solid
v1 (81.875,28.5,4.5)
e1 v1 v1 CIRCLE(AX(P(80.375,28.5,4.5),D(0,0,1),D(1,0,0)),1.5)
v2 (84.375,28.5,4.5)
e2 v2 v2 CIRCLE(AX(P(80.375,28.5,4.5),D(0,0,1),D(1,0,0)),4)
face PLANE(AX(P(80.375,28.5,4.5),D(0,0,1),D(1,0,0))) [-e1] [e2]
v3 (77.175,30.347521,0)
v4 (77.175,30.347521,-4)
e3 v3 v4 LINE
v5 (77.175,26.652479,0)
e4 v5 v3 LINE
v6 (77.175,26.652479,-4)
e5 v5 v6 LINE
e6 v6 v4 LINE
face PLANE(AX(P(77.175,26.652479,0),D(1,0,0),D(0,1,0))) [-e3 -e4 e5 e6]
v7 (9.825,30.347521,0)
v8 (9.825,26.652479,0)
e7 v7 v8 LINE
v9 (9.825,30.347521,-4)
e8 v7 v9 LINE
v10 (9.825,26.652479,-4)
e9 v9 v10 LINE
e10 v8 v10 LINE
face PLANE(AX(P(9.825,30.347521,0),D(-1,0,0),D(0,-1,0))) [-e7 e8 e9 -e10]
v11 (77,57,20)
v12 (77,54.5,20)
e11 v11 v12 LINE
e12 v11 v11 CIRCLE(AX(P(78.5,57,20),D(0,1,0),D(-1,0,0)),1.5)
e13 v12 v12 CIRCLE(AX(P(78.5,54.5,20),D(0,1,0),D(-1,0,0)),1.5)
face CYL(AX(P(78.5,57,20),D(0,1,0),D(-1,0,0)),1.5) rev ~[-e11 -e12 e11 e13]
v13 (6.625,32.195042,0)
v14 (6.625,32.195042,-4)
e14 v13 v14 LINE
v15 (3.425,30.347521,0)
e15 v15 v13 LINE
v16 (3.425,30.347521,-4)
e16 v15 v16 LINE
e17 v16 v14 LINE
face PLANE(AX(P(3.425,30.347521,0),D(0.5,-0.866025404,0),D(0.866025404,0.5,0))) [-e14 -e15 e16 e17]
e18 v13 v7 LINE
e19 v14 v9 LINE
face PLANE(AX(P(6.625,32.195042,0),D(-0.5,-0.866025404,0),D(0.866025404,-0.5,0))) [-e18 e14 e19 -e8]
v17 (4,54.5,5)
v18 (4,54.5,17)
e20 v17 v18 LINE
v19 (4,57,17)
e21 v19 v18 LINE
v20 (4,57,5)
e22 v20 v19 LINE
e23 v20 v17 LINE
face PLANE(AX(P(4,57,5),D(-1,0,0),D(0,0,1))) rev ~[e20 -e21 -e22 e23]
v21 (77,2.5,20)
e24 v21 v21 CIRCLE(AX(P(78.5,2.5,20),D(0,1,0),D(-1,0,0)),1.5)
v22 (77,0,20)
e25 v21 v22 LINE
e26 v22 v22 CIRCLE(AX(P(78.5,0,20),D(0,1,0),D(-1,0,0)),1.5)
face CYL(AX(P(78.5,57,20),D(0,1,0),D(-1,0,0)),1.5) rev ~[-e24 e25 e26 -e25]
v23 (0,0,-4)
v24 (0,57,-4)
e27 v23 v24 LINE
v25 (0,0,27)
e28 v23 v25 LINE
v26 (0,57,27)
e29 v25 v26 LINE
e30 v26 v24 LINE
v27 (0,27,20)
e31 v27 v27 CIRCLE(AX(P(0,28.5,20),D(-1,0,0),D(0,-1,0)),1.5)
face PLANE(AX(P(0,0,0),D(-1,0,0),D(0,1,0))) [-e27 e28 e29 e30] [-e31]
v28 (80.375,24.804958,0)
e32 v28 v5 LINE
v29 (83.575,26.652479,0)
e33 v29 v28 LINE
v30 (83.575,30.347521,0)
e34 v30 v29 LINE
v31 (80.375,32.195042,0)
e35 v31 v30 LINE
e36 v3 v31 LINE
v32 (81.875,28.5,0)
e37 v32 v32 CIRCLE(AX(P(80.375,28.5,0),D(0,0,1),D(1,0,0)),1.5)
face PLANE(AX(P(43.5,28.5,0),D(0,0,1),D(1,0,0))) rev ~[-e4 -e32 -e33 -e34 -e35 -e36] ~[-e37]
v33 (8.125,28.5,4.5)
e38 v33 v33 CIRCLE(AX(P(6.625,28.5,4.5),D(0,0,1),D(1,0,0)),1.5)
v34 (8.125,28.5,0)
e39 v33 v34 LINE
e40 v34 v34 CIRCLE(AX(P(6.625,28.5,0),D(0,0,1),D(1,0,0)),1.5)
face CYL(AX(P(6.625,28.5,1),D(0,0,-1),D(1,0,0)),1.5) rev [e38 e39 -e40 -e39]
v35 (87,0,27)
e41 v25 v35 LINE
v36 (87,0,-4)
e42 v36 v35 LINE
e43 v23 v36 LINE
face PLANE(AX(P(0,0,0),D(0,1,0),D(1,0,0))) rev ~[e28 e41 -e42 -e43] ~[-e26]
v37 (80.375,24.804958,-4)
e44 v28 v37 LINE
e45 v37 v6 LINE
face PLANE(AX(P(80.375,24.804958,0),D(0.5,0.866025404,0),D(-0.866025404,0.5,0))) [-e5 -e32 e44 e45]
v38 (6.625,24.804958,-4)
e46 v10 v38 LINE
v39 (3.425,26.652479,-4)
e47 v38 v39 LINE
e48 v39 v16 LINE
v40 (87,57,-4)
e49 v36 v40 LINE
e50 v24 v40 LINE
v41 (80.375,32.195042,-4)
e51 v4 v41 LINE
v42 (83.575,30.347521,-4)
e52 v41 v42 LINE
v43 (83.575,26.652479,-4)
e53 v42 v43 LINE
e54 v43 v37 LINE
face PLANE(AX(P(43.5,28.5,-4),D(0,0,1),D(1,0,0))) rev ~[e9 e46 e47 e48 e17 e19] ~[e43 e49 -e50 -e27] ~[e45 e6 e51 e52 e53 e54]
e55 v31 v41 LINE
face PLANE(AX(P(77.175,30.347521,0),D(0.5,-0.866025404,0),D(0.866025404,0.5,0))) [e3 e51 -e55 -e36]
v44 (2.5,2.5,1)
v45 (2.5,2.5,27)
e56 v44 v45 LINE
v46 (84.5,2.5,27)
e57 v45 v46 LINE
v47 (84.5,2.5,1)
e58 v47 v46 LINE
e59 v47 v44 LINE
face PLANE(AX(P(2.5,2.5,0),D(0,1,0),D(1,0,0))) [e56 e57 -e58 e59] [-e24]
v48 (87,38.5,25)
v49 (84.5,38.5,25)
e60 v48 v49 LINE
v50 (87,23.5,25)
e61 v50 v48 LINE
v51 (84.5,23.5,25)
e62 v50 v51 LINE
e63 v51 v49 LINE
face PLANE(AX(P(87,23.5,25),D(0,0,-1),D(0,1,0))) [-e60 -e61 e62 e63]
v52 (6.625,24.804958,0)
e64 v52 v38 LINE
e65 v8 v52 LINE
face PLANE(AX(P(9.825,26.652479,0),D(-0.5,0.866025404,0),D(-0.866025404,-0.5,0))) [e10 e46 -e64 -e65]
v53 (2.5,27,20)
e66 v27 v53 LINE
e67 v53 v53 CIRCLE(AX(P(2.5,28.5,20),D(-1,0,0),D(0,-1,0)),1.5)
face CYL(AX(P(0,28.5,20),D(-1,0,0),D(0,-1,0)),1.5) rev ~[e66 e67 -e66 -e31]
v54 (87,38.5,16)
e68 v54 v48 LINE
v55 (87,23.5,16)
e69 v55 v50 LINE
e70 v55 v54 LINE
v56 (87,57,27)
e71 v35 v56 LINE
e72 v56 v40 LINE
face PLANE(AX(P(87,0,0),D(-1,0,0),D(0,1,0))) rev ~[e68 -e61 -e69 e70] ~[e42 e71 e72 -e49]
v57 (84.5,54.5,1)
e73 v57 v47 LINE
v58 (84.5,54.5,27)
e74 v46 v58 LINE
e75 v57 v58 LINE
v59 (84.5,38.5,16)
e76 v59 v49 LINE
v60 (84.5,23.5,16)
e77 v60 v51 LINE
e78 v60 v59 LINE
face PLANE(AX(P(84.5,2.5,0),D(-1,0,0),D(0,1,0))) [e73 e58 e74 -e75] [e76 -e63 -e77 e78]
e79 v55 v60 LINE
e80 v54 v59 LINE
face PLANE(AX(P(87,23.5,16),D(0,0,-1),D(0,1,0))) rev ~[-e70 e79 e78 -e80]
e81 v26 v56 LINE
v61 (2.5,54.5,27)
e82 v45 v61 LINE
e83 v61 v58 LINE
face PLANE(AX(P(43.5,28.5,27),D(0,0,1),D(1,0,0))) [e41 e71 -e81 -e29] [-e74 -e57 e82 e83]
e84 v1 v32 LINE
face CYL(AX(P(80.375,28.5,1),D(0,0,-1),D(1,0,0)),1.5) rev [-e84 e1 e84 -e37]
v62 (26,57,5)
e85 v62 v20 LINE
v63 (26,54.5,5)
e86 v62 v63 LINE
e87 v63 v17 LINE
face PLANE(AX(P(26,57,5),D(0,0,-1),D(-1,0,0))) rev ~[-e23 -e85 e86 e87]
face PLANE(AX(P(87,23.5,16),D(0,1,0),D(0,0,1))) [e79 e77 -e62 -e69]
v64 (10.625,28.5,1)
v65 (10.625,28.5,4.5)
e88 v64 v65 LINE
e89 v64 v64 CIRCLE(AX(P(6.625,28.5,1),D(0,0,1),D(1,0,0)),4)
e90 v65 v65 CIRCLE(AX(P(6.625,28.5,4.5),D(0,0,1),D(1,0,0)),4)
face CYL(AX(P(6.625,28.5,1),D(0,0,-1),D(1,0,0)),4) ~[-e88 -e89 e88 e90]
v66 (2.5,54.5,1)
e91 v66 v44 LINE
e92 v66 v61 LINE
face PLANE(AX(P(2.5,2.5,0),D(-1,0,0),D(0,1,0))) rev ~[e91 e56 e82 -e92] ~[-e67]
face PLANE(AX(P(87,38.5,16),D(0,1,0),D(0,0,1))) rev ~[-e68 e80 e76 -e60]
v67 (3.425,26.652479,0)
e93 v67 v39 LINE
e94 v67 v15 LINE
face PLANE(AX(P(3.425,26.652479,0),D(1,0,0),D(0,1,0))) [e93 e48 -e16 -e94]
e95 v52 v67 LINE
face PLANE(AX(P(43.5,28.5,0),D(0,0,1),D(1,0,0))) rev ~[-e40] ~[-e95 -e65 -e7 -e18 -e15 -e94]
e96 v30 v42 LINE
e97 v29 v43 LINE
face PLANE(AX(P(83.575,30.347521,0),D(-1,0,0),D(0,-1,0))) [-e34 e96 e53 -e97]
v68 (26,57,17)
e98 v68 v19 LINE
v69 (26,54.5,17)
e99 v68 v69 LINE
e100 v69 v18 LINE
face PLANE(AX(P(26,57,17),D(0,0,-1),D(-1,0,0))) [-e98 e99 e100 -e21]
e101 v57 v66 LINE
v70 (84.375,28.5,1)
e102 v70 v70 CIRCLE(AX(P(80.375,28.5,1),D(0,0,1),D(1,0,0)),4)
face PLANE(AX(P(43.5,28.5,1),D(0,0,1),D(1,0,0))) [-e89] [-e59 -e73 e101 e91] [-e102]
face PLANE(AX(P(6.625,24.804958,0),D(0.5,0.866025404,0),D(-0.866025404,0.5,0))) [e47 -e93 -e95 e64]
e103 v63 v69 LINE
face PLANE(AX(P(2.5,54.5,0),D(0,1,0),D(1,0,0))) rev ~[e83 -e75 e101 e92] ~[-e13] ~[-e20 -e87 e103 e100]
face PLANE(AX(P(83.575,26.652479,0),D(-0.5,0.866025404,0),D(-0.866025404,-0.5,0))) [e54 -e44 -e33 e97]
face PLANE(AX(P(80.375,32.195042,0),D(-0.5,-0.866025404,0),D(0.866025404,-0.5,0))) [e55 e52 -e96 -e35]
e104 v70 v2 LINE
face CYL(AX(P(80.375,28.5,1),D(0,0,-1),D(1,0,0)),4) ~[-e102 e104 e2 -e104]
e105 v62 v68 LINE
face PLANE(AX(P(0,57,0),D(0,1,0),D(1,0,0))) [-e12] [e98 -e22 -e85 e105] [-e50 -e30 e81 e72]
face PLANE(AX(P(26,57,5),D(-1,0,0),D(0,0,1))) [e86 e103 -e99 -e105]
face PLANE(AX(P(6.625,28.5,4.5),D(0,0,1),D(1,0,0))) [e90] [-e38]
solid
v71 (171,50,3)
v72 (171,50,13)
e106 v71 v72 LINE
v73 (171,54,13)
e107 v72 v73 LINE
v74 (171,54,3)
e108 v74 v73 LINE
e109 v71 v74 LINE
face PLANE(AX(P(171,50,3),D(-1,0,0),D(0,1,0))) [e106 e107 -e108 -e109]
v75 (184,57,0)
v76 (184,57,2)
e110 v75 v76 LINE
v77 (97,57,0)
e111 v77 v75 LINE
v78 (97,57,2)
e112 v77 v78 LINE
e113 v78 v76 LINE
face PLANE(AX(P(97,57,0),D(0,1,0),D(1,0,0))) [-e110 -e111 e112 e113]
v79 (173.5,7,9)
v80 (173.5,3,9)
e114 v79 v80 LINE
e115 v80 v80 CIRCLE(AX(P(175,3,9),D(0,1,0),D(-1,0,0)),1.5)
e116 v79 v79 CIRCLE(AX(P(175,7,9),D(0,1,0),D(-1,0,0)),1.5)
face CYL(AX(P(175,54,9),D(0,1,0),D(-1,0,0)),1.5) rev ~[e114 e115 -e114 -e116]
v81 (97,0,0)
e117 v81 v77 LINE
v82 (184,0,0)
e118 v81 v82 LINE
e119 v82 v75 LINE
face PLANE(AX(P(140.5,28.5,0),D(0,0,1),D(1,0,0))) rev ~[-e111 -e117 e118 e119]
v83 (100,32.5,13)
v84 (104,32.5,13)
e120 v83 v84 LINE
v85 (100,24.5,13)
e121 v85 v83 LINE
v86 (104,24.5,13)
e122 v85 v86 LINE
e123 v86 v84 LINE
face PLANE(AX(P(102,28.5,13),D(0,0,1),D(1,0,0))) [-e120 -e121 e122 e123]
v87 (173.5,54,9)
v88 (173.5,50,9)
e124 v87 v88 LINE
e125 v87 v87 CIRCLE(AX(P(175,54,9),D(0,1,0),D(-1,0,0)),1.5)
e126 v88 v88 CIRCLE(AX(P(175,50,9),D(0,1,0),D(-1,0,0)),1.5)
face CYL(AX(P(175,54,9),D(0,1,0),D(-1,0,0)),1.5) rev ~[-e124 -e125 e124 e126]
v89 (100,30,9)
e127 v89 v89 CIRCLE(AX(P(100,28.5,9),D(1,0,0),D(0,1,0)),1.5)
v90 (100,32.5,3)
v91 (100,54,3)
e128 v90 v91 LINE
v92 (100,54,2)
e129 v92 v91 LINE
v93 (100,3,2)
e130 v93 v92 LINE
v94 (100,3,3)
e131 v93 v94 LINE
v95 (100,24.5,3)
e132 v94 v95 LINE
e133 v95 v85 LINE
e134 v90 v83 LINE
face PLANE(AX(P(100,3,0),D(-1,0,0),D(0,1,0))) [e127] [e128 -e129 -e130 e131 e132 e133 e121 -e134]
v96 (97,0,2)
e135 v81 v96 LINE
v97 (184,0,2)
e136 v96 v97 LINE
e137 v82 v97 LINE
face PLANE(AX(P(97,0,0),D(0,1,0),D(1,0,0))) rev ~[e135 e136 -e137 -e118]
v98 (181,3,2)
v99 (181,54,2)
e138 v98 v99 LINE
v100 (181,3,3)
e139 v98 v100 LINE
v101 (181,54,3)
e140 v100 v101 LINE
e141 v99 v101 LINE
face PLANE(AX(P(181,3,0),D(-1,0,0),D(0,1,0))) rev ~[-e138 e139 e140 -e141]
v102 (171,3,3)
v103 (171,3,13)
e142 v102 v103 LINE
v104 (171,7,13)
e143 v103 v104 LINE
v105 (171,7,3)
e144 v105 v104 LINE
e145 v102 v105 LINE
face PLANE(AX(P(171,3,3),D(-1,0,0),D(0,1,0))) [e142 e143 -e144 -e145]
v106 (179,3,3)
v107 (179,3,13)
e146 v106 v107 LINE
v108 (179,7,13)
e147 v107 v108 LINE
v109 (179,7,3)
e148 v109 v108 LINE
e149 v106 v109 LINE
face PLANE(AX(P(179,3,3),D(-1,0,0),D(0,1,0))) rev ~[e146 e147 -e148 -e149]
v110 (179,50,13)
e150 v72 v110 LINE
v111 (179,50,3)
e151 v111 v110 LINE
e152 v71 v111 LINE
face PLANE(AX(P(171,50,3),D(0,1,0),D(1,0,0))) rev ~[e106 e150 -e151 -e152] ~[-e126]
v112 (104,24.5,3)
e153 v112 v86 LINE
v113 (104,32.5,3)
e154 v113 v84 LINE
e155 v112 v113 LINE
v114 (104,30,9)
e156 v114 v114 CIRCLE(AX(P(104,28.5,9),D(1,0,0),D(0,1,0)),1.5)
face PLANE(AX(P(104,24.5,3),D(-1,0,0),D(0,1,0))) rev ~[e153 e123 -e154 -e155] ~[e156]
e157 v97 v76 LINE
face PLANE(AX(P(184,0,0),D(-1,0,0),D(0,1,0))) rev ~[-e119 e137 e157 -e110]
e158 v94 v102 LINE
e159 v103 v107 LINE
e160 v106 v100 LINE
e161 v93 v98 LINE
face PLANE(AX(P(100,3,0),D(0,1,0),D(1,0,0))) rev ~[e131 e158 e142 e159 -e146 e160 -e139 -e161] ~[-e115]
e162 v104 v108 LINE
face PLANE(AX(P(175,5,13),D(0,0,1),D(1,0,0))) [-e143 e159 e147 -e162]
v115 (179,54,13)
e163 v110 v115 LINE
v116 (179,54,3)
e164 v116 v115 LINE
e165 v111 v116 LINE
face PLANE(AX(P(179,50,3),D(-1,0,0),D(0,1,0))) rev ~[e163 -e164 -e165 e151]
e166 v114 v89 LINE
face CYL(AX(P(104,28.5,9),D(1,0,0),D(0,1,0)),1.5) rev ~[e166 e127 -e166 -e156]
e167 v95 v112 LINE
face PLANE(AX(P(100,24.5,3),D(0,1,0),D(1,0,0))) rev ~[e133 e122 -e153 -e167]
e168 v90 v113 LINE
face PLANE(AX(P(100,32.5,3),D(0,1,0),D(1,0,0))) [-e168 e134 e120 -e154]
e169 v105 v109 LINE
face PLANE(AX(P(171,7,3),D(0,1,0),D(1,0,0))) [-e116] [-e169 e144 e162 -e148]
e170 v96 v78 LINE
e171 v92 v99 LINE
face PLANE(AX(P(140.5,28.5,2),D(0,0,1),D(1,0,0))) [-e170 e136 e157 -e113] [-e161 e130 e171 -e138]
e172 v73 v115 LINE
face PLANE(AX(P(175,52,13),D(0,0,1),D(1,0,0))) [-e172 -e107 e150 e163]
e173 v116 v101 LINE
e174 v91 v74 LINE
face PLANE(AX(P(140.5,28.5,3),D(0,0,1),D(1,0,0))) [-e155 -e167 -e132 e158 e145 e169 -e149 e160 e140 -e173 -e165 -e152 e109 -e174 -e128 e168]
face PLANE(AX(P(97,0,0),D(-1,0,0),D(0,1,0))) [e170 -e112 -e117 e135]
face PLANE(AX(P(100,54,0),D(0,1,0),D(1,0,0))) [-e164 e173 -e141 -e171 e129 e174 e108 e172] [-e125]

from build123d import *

# Parameters (mm, degrees)
F3_W      = 87
F3_H      = 57
F3_W_2    = 82
F3_H_2    = 52
F4_DEPTH  = 4
F3_R      = 1.5
F5_DEPTH  = 1
F7_R      = 4
F7_R_2    = 1.5
F8_DEPTH  = 3.5
F10_DEPTH = 27
F11_W     = 15
F11_H     = 9
F12_DEPTH = 2.5
F13_W     = 22
F13_H     = 12
F14_DEPTH = 2.5
F13_R     = 1.5
F15_DEPTH = 57.001
F3_W_3    = 81
F3_H_3    = 51
F18_DEPTH = 3
F19_DEPTH = 2
F20_W     = 8
F20_H     = 4
F20_W_2   = 4
F20_H_2   = 8
F21_DEPTH = 10
F22_R     = 1.5
F24_DEPTH = 54.001
F23_R     = 1.5
F25_DEPTH = 104.001
F26_R     = 1.5
F27_DEPTH = 2.5


with BuildPart() as f4:
    # F3 (on Top) → F4 (new body)
    with BuildSketch(Plane.XY):
        with Locations((43.5, 28.5)):
            Rectangle(F3_W, F3_H)
        with Locations((43.5, 28.5)):
            Rectangle(F3_W_2, F3_H_2, mode=Mode.SUBTRACT)
        with Locations((43.5, 28.5)):
            Rectangle(F3_W_2, F3_H_2)
        Polygon((6.625, 32.1950417228), (9.825, 30.3475208614), (9.825, 26.6524791386), (6.625, 24.8049582772), (3.425, 26.6524791386), (3.425, 30.3475208614), align=None, mode=Mode.SUBTRACT)
        Polygon((80.375, 32.1950417228), (83.575, 30.3475208614), (83.575, 26.6524791386), (80.375, 24.8049582772), (77.175, 26.6524791386), (77.175, 30.3475208614), align=None, mode=Mode.SUBTRACT)
    extrude(amount=-F4_DEPTH)

    # F3 (on Top) → F5 (join)
    with BuildSketch(Plane.XY):
        with Locations((43.5, 28.5)):
            Rectangle(F3_W, F3_H)
        with Locations((43.5, 28.5)):
            Rectangle(F3_W_2, F3_H_2, mode=Mode.SUBTRACT)
        with Locations((43.5, 28.5)):
            Rectangle(F3_W_2, F3_H_2)
        Polygon((6.625, 32.1950417228), (9.825, 30.3475208614), (9.825, 26.6524791386), (6.625, 24.8049582772), (3.425, 26.6524791386), (3.425, 30.3475208614), align=None, mode=Mode.SUBTRACT)
        Polygon((80.375, 32.1950417228), (83.575, 30.3475208614), (83.575, 26.6524791386), (80.375, 24.8049582772), (77.175, 26.6524791386), (77.175, 30.3475208614), align=None, mode=Mode.SUBTRACT)
        Polygon((9.825, 26.6524791386), (9.825, 30.3475208614), (6.625, 32.1950417228), (3.425, 30.3475208614), (3.425, 26.6524791386), (6.625, 24.8049582772), align=None)
        with Locations((6.625, 28.5)):
            Circle(F3_R, mode=Mode.SUBTRACT)
        Polygon((83.575, 26.6524791386), (83.575, 30.3475208614), (80.375, 32.1950417228), (77.175, 30.3475208614), (77.175, 26.6524791386), (80.375, 24.8049582772), align=None)
        with Locations((80.375, 28.5)):
            Circle(F3_R, mode=Mode.SUBTRACT)
    extrude(amount=F5_DEPTH)

    # F7 (on face) → F8 (join)
    with BuildSketch(Plane.XY.offset(1)):
        with Locations((6.625, 28.5)):
            Circle(F7_R)
        with Locations((6.625, 28.5)):
            Circle(F7_R_2, mode=Mode.SUBTRACT)
        with Locations((80.375, 28.5)):
            Circle(F7_R)
        with Locations((80.375, 28.5)):
            Circle(F7_R_2, mode=Mode.SUBTRACT)
    extrude(amount=F8_DEPTH)

    # F3 (on Top) → F10 (join)
    with BuildSketch(Plane.XY):
        with Locations((43.5, 28.5)):
            Rectangle(F3_W, F3_H)
        with Locations((43.5, 28.5)):
            Rectangle(F3_W_2, F3_H_2, mode=Mode.SUBTRACT)
    extrude(amount=F10_DEPTH)

    # F11 (on face) → F12 (cut, through all)
    with BuildSketch(Plane.YZ.offset(87)):
        with Locations((31, 20.5)):
            Rectangle(F11_W, F11_H)
    extrude(amount=-F12_DEPTH, mode=Mode.SUBTRACT)

    # F13 (on face) → F14 (cut)
    with BuildSketch(Plane(origin=(0, 57, 0), x_dir=(-1, 0, 0), z_dir=(0, 1, 0))):
        with Locations((-15, 11)):
            Rectangle(F13_W, F13_H)
    extrude(amount=-F14_DEPTH, mode=Mode.SUBTRACT)

    # F13 (on face) → F15 (cut, through all)
    with BuildSketch(Plane(origin=(0, 57, 0), x_dir=(-1, 0, 0), z_dir=(0, 1, 0))):
        with Locations((-78.5, 20)):
            Circle(F13_R)
    extrude(amount=-F15_DEPTH, mode=Mode.SUBTRACT)

    # F26 (on face) → F27 (cut, through all)
    with BuildSketch(Plane(origin=(0, 0, 0), x_dir=(0, -1, 0), z_dir=(-1, 0, 0))):
        with Locations((-28.5, 20)):
            Circle(F26_R)
    extrude(amount=-F27_DEPTH, mode=Mode.SUBTRACT)


with BuildPart() as f18:
    # F3 (on Top) → F18 (new body)
    with BuildSketch(Plane.XY):
        with Locations((140.5, 28.5)):
            Rectangle(F3_W_3, F3_H_3)
    extrude(amount=F18_DEPTH)

    # F3 (on Top) → F19 (join)
    with BuildSketch(Plane.XY):
        with Locations((140.5, 28.5)):
            Rectangle(F3_W, F3_H)
        with Locations((140.5, 28.5)):
            Rectangle(F3_W_3, F3_H_3, mode=Mode.SUBTRACT)
    extrude(amount=F19_DEPTH)

    # F20 (on face) → F21 (join)
    with BuildSketch(Plane.XY.offset(3)):
        with Locations((175, 52)):
            Rectangle(F20_W, F20_H)
        with Locations((175, 5)):
            Rectangle(F20_W, F20_H)
        with Locations((102, 28.5)):
            Rectangle(F20_W_2, F20_H_2)
    extrude(amount=F21_DEPTH)

    # F22 (on face) → F24 (cut, through all)
    with BuildSketch(Plane(origin=(0, 54, 0), x_dir=(-1, 0, 0), z_dir=(0, 1, 0))):
        with Locations((-175, 9)):
            Circle(F22_R)
    extrude(amount=-F24_DEPTH, mode=Mode.SUBTRACT)

    # F23 (on face) → F25 (cut, through all)
    with BuildSketch(Plane.YZ.offset(104)):
        with Locations((28.5, 9)):
            Circle(F23_R)
    extrude(amount=-F25_DEPTH, mode=Mode.SUBTRACT)


solid = Compound([f4.part, f18.part])
